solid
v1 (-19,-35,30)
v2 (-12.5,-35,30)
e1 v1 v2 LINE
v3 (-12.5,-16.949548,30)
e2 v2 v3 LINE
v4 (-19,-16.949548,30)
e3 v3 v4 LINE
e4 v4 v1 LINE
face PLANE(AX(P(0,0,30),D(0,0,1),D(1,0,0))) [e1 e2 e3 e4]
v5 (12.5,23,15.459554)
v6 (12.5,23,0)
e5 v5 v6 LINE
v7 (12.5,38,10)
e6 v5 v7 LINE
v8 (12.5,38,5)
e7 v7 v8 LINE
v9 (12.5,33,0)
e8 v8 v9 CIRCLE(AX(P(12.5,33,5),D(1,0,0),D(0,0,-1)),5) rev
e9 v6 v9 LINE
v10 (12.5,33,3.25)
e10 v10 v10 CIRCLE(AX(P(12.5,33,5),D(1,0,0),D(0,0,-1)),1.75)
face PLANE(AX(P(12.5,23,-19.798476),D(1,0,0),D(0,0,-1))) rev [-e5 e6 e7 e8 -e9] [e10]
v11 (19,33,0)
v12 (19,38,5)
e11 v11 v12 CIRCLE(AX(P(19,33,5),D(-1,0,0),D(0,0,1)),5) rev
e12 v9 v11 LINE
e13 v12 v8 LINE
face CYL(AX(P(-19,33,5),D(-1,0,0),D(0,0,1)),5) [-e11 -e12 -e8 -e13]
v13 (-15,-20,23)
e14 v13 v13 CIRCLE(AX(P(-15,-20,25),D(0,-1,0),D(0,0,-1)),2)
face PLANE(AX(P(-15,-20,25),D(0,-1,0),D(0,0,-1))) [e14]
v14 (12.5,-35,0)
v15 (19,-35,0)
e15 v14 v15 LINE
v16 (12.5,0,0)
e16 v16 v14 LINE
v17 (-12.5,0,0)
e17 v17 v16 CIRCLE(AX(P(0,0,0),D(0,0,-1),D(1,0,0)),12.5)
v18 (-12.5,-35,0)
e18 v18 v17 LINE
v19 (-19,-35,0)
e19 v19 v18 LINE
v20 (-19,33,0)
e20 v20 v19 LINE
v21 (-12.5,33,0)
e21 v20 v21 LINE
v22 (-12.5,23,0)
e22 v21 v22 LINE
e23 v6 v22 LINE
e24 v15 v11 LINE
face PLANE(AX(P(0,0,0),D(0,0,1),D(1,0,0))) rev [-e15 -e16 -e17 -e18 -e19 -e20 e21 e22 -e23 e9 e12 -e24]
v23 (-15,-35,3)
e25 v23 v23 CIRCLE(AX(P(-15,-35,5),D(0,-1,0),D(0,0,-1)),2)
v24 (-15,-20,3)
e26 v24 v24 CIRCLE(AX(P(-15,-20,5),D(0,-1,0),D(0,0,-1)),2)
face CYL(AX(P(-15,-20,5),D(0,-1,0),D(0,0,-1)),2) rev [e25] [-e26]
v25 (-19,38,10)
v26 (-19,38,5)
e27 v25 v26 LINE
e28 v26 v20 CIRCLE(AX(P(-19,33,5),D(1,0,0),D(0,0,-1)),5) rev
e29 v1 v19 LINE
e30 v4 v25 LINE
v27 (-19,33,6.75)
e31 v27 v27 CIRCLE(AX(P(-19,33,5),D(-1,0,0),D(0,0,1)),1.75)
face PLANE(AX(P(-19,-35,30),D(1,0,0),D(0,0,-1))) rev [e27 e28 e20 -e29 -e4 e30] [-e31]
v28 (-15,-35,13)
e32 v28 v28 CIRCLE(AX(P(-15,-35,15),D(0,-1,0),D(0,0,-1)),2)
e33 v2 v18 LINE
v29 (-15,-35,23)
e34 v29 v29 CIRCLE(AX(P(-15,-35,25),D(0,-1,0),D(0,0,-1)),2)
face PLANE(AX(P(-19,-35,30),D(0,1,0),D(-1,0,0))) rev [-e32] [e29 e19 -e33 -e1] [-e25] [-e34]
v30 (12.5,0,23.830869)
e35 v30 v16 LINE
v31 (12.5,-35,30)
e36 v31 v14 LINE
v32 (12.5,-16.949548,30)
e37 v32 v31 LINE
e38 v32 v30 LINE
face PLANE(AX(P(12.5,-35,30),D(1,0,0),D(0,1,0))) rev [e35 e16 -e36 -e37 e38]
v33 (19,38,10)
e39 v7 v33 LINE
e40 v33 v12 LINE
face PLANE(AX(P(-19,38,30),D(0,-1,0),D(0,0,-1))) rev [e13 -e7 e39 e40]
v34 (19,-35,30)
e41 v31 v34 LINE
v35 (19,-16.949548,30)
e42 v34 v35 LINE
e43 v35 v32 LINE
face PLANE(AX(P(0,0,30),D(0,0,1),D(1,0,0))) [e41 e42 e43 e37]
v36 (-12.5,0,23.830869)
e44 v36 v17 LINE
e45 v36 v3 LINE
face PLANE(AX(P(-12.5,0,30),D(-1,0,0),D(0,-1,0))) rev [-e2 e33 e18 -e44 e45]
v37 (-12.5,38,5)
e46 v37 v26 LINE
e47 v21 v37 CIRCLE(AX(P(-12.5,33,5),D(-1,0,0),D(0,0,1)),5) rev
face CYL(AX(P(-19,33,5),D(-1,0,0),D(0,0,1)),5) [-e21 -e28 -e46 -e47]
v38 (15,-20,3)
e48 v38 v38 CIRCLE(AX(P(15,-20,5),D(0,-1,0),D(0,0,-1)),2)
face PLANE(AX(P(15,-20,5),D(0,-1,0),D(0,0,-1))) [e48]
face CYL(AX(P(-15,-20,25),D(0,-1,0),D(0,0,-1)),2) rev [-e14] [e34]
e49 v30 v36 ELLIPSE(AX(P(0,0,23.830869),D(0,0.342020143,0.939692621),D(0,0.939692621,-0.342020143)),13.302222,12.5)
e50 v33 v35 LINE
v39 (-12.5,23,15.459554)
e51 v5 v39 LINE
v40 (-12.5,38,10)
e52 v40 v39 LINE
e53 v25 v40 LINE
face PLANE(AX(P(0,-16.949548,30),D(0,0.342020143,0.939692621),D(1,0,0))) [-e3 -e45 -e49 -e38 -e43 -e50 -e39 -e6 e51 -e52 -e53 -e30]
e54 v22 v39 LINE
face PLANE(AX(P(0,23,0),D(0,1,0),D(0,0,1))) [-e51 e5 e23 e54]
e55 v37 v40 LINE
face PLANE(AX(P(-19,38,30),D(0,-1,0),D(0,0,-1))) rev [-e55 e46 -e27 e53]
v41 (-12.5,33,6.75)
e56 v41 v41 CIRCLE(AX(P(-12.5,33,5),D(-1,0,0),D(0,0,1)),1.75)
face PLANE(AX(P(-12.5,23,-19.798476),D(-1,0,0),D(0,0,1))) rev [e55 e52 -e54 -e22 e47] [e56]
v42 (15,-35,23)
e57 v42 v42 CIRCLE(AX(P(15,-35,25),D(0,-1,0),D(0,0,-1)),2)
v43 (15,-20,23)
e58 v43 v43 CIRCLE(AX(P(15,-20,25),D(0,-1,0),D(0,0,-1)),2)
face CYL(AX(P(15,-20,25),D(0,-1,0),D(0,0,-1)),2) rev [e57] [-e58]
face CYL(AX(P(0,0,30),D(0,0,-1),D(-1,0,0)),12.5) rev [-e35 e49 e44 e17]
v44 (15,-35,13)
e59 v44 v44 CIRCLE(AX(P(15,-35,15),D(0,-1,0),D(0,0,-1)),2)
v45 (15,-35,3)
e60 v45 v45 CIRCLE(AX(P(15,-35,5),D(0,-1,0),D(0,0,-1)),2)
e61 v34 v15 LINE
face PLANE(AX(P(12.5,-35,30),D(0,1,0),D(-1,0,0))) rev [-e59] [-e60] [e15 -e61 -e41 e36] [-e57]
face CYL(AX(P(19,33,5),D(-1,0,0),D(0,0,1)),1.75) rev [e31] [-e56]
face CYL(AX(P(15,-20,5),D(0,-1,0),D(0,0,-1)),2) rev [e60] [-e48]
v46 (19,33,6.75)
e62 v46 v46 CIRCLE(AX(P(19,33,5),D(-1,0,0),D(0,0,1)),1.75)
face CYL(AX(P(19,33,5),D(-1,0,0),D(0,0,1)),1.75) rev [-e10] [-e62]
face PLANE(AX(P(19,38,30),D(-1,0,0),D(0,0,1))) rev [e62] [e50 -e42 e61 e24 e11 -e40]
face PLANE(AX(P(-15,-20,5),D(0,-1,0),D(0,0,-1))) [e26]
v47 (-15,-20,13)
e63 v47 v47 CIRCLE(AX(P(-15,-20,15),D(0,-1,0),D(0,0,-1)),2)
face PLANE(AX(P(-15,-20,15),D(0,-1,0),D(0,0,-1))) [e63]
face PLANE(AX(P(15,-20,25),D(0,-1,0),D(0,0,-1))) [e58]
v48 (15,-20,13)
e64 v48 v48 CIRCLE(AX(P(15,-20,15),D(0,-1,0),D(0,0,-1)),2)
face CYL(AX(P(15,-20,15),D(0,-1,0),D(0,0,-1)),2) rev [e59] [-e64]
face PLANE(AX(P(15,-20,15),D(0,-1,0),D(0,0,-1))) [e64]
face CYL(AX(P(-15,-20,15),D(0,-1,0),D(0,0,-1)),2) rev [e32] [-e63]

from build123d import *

# Parameters (mm, degrees)
BOSS_EXTRUDE1_DEPTH = 30
SKETCH2_R           = 2
CUT_EXTRUDE1_DEPTH  = 15
FILLET1_R           = 5
CHAMFER1_SIZE       = 20
CHAMFER1_SIZE_2     = 54.949548389
SKETCH3_W           = 25
SKETCH3_H           = 39.596952294
CUT_EXTRUDE2_DEPTH  = 15
SKETCH4_R           = 1.75
CUT_EXTRUDE3_DEPTH  = 62.546730214


with BuildPart() as part:
    # Sketch1 → Boss-Extrude1 (new body)
    with BuildSketch(Plane.XY):
        with BuildLine():
            Line((-12.5, 0), (-12.5, -35))
            Line((-12.5, -35), (-19, -35))
            Line((-19, -35), (-19, 38))
            Line((-19, 38), (19, 38))
            Line((19, 38), (19, -35))
            Line((19, -35), (12.5, -35))
            Line((12.5, -35), (12.5, 0))
            ThreePointArc((12.5, 0), (0, 12.5), (-12.5, 0))
        make_face()
    extrude(amount=BOSS_EXTRUDE1_DEPTH)

    # Sketch2 → Cut-Extrude1 (cut)
    with BuildSketch(Plane.XZ.offset(35)):
        with Locations(Location((-15, 5, 0), (0, 0, 270))):
            Circle(SKETCH2_R)
        with Locations(Location((15, 5, 0), (0, 0, 270))):
            Circle(SKETCH2_R)
        with Locations(Location((-15, 15, 0), (0, 0, 270))):
            Circle(SKETCH2_R)
        with Locations(Location((15, 15, 0), (0, 0, 270))):
            Circle(SKETCH2_R)
        with Locations(Location((-15, 25, 0), (0, 0, 270))):
            Circle(SKETCH2_R)
        with Locations(Location((15, 25, 0), (0, 0, 270))):
            Circle(SKETCH2_R)
    extrude(amount=-CUT_EXTRUDE1_DEPTH, mode=Mode.SUBTRACT)

    # Fillet1
    fillet1_edges = [part.edges().sort_by_distance(p)[0] for p in [
        (0, 38, 0),
    ]]
    fillet(fillet1_edges, radius=FILLET1_R)

    # Chamfer1
    # the kernel refuses this chamfer: 54.949548389, 20 mm, written as the material it takes off along each edge
    with BuildSketch(Plane(origin=(-161.549828987, 38, 30), x_dir=(0, 0.09904090225205052, -0.9950833631817486), z_dir=(1, 0, 0))) as chamfer1_piece_1:
        Polygon((CHAMFER1_SIZE * 0.995083363182, -CHAMFER1_SIZE * 0.0990409022521), (-CHAMFER1_SIZE_2 * 0.0990409022522, -CHAMFER1_SIZE_2 * 0.995083363183), (0, 0), align=None)
    extrude(amount=323.099657974, mode=Mode.SUBTRACT)

    # Sketch3 → Cut-Extrude2 (cut)
    with BuildSketch(Plane(origin=(0, 38, 0), x_dir=(1, 0, 0), z_dir=(0, 1, 0))):
        Rectangle(SKETCH3_W, SKETCH3_H)
    extrude(amount=-CUT_EXTRUDE2_DEPTH, mode=Mode.SUBTRACT)

    # Sketch4 → Cut-Extrude3 (cut, through all)
    with BuildSketch(Plane.ZY.offset(19)):
        with Locations((5, 33)):
            Circle(SKETCH4_R)
    extrude(amount=-CUT_EXTRUDE3_DEPTH, mode=Mode.SUBTRACT)


solid = part.part
